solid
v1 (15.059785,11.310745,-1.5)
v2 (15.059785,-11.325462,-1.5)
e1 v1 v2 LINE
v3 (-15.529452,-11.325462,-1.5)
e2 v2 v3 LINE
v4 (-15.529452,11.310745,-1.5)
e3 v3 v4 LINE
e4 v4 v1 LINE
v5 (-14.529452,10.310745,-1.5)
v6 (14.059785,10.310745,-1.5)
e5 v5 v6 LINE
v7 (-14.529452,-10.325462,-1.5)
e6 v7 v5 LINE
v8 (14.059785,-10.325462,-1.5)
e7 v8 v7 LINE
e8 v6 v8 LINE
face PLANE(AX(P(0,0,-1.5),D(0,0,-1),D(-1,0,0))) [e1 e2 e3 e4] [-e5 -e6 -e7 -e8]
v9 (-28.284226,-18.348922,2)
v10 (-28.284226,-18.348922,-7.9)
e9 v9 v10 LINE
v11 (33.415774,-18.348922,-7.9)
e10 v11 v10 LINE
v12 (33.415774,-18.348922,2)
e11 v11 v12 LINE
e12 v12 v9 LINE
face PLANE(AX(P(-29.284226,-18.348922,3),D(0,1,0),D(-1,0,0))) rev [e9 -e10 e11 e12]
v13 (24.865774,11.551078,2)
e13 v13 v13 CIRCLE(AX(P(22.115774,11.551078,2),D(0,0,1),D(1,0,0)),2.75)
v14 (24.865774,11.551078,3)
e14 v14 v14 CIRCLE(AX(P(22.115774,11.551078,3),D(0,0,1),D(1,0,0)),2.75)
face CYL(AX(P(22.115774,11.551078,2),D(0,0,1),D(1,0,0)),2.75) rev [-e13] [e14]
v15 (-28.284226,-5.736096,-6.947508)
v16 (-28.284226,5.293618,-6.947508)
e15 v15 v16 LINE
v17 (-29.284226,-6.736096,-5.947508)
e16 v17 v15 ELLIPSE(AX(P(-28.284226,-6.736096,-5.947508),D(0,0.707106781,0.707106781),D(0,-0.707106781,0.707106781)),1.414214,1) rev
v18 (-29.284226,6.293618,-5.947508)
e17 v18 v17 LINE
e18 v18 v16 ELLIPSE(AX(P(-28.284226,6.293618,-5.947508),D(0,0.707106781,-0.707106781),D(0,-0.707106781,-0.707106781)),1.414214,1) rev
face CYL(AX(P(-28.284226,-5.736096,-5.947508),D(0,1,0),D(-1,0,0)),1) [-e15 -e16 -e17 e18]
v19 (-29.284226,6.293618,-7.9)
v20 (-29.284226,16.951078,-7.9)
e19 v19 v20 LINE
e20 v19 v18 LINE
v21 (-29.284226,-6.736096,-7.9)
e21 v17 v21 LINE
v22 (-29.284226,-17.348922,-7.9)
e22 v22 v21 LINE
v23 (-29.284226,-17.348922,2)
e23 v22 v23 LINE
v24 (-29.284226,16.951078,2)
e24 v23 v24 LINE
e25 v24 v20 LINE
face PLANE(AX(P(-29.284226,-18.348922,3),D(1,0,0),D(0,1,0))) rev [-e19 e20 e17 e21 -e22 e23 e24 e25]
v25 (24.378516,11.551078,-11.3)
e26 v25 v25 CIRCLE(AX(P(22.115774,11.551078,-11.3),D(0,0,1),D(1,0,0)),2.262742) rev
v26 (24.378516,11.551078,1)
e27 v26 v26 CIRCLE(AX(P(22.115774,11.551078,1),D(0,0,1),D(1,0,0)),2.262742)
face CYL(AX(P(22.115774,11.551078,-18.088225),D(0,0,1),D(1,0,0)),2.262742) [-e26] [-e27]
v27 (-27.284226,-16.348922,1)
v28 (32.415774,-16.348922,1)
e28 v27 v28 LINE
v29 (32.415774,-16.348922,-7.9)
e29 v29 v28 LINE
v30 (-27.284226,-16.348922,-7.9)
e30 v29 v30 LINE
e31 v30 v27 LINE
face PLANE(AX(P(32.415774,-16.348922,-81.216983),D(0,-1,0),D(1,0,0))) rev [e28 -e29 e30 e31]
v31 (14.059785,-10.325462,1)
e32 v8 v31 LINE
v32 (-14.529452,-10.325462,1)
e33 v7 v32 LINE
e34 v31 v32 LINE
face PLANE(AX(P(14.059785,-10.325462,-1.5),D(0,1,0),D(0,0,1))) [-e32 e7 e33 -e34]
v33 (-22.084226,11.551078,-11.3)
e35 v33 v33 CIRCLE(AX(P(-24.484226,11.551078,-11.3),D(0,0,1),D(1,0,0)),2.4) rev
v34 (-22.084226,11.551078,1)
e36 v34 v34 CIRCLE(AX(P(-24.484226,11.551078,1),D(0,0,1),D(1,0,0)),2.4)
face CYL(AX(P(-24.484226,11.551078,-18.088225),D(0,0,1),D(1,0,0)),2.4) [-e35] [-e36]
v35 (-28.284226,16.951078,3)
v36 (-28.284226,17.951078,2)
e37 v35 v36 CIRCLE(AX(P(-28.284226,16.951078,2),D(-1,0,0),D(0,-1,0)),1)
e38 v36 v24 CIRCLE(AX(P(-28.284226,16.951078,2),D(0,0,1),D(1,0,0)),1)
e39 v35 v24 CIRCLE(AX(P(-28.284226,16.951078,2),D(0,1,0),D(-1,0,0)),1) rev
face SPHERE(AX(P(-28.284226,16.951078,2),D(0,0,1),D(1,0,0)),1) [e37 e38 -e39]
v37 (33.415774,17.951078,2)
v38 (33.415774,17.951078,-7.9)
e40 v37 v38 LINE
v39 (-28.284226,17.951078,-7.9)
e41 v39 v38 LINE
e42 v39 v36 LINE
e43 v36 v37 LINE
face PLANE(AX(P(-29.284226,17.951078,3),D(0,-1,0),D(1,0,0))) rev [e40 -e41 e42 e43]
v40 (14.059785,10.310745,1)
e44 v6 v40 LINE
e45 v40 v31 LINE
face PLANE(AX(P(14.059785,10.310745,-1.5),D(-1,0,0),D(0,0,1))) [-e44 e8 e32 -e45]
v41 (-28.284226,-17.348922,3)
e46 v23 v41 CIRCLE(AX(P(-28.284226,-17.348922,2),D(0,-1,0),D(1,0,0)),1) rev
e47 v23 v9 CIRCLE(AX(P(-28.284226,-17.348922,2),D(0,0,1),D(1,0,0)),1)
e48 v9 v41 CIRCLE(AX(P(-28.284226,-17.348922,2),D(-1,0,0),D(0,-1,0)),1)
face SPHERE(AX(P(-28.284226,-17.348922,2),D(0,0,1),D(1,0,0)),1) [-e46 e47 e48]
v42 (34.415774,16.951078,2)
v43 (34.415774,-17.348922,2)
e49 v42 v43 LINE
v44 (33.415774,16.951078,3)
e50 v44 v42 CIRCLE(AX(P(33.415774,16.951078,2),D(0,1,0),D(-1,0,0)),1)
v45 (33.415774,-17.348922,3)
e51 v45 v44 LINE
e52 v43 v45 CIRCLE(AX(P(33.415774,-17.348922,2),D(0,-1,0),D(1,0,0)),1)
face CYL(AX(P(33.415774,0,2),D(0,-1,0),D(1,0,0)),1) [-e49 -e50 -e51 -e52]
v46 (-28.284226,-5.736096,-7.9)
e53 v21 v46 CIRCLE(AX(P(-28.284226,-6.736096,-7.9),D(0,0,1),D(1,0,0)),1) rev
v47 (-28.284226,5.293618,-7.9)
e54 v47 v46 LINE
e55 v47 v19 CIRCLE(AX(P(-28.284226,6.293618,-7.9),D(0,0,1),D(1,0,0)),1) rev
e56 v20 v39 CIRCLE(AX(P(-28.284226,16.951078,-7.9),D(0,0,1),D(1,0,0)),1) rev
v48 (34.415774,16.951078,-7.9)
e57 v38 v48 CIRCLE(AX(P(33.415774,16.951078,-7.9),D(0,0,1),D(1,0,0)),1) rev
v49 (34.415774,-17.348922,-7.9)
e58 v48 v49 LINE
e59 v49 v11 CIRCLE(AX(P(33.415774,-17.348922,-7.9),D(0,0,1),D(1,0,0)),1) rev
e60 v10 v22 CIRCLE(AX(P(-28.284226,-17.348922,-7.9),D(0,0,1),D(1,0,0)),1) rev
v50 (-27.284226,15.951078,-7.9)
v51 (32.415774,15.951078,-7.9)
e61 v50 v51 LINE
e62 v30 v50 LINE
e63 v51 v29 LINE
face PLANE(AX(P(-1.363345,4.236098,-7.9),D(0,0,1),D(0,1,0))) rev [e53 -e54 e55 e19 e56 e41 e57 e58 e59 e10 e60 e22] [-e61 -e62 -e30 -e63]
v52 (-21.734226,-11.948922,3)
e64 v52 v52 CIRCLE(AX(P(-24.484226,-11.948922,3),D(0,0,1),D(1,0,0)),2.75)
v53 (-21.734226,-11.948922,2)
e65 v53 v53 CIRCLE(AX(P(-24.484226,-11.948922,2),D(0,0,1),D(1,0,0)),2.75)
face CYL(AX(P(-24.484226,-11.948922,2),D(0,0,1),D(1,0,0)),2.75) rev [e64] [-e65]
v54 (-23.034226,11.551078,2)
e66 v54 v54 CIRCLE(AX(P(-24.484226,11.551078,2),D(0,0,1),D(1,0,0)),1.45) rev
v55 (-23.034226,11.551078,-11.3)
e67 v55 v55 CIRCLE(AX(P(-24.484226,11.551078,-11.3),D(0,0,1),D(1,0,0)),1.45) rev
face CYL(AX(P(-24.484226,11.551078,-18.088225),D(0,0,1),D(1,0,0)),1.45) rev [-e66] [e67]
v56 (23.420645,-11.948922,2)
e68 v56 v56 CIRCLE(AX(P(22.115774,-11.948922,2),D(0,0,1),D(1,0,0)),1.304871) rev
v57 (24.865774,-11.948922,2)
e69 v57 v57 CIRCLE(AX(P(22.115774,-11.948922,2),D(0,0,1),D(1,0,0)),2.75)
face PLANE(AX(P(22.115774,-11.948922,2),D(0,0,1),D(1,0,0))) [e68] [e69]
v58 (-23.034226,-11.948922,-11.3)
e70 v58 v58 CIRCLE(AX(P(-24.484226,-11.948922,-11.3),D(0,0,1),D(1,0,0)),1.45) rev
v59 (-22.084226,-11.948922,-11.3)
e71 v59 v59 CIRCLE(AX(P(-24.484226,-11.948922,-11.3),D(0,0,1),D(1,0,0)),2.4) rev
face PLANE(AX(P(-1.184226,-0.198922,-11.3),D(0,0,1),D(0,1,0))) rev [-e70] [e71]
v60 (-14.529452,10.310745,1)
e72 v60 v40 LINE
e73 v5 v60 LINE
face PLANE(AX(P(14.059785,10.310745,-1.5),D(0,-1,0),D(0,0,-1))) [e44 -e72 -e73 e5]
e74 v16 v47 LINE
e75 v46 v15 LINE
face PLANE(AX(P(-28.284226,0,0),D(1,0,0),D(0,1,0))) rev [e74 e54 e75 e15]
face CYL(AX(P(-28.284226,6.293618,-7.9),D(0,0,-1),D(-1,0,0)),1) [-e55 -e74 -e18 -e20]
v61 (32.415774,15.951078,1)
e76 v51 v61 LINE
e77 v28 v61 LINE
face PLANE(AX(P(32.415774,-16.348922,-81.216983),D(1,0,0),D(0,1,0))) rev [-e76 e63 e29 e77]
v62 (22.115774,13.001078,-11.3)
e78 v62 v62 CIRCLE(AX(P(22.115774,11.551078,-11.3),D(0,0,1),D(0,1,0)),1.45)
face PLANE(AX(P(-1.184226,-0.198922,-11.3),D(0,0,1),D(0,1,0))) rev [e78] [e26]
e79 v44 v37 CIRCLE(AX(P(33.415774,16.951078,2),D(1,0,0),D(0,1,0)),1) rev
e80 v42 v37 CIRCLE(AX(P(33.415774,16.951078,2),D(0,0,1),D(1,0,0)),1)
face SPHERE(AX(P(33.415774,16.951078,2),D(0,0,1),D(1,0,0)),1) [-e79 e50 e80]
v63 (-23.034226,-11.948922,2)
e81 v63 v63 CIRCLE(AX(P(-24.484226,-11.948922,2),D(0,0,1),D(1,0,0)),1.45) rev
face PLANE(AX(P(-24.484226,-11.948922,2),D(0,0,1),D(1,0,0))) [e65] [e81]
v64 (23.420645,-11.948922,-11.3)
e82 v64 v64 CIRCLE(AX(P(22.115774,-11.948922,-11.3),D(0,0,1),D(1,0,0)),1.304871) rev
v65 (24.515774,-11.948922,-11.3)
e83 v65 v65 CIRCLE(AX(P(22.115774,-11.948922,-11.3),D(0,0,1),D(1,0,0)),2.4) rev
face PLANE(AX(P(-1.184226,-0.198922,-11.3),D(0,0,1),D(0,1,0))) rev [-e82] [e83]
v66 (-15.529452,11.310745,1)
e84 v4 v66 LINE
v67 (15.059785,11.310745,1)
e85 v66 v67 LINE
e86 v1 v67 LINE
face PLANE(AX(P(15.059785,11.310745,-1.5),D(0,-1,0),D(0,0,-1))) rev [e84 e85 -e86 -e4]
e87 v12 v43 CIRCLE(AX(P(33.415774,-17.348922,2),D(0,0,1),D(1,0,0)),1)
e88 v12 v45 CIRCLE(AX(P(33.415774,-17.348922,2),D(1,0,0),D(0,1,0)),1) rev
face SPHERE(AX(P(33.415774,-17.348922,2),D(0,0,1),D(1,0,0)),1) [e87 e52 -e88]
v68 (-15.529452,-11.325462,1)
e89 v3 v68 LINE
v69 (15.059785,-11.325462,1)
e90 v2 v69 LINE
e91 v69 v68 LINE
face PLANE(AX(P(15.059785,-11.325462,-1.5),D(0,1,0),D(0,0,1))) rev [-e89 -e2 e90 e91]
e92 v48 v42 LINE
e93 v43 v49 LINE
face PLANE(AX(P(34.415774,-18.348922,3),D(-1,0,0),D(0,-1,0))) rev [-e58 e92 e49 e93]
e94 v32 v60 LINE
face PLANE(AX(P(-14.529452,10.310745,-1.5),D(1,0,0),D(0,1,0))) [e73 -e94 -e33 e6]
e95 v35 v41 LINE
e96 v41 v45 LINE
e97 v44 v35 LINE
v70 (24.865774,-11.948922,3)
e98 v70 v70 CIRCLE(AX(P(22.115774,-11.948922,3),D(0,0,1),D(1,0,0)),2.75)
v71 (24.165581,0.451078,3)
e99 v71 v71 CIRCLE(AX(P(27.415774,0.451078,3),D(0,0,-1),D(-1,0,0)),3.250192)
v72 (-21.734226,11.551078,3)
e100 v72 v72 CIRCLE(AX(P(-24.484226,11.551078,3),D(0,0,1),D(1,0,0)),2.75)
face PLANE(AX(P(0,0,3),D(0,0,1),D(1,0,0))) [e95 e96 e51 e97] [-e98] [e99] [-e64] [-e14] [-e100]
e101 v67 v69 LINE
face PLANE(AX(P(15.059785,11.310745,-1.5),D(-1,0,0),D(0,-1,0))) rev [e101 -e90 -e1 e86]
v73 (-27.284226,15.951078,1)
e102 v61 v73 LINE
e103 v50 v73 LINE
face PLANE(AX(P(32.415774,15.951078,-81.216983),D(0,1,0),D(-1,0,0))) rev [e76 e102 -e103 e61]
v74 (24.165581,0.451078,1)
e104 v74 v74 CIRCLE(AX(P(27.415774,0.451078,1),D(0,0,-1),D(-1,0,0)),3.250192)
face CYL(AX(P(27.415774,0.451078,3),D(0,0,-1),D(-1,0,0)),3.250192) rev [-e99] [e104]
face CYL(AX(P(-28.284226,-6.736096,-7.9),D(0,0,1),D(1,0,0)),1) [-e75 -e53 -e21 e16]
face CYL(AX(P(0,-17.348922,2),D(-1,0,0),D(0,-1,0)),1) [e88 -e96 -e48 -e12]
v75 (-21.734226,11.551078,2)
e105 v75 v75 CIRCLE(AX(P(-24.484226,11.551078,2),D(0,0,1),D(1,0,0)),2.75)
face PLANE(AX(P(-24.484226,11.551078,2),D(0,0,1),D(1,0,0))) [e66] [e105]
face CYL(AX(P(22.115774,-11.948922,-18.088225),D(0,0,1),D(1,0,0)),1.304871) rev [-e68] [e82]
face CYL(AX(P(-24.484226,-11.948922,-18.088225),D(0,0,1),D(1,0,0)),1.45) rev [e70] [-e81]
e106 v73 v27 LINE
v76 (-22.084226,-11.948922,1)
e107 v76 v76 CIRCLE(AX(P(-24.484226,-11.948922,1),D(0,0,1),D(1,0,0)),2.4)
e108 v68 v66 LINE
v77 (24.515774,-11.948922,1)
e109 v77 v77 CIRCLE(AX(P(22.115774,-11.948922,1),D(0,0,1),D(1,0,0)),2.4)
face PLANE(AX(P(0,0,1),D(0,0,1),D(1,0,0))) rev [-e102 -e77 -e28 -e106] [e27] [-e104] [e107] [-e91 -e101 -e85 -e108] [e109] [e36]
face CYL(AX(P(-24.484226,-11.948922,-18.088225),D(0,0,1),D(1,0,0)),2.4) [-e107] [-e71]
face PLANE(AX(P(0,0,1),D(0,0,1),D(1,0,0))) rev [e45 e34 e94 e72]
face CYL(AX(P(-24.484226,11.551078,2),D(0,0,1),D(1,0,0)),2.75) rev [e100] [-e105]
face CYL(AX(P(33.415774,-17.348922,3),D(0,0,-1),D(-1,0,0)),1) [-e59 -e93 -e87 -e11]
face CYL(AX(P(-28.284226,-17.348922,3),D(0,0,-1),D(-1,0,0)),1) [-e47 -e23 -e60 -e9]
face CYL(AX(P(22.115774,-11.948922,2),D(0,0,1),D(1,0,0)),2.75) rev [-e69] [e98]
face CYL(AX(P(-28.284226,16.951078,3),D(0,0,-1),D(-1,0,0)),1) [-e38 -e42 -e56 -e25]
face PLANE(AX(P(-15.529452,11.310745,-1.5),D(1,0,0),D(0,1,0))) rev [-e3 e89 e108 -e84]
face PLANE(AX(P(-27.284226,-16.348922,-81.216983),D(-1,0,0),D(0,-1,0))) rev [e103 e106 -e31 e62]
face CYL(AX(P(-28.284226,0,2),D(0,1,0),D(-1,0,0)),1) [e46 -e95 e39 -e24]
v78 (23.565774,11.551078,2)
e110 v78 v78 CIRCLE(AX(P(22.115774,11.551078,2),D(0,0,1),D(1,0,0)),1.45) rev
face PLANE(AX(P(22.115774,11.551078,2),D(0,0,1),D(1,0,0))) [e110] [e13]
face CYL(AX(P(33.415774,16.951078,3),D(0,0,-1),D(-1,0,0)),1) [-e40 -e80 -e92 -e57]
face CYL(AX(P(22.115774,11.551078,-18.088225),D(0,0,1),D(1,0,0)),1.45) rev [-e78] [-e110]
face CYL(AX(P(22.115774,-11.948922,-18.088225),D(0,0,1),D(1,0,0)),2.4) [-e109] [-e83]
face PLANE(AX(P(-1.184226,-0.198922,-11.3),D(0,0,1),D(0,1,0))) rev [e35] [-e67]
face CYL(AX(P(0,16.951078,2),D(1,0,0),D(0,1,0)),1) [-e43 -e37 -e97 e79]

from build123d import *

# Parameters (mm, degrees)
CROQUIS2_R                = 2.4
CROQUIS2_R_2              = 1.45
SALIENTE_EXTRUIR2_DEPTH   = 12.3
SALIENTE_EXTRUIR2_2_DEPTH = 12.3
CROQUIS2_R_3              = 2.2627417
SALIENTE_EXTRUIR2_3_DEPTH = 12.3
CROQUIS2_R_4              = 1.304870774
SALIENTE_EXTRUIR2_4_DEPTH = 12.3
CROQUIS4_W                = 36.3
CROQUIS4_H                = 63.7
CROQUIS4_W_2              = 32.3
CROQUIS4_H_2              = 59.7
SALIENTE_EXTRUIR4_DEPTH   = 8.9
CROQUIS5_W                = 36.3
CROQUIS5_H                = 63.7
SALIENTE_EXTRUIR5_DEPTH   = 2
REDONDEO1_R               = 1
CROQUIS6_W                = 0.952491513
CROQUIS6_H                = 11.029714725
CORTAR_EXTRUIR1_DEPTH     = 1
REDONDEO2_R               = 1
CROQUIS7_R                = 1.45
CROQUIS7_R_2              = 1.304870774
CORTAR_EXTRUIR2_DEPTH     = 42.540563821
CROQUIS8_R                = 2.75
CORTAR_EXTRUIR3_DEPTH     = 1
CROQUIS9_R                = 3.250192478
CORTAR_EXTRUIR4_DEPTH     = 41.895212954
CROQUIS10_W               = 30.589236147
CROQUIS10_H               = 22.63620754
CROQUIS10_W_2             = 28.589236147
CROQUIS10_H_2             = 20.63620754
SALIENTE_EXTRUIR6_DEPTH   = 2.5


with BuildPart() as part:
    # Croquis2 → Saliente-Extruir2 (new body)
    with BuildSketch(Plane(origin=(-1.363345475, 4.236097797, 1), x_dir=(0, 1, 0), z_dir=(0, 0, 1))):
        with Locations(Location((-16.185020115, 23.120880637, 0), (0, 0, 270))):
            Circle(CROQUIS2_R)
        with Locations(Location((-16.185020115, 23.120880637, 0), (0, 0, 270))):
            Circle(CROQUIS2_R_2, mode=Mode.SUBTRACT)
    extrude(amount=-SALIENTE_EXTRUIR2_DEPTH)



with BuildPart() as body_2:
    # Croquis2 → Saliente-Extruir2 2 (new body)
    with BuildSketch(Plane(origin=(-1.363345475, 4.236097797, 1), x_dir=(0, 1, 0), z_dir=(0, 0, 1))):
        with Locations(Location((7.314979885, 23.120880637, 0), (0, 0, 270))):
            Circle(CROQUIS2_R)
        with Locations(Location((7.314979885, 23.120880637, 0), (0, 0, 270))):
            Circle(CROQUIS2_R_2, mode=Mode.SUBTRACT)
    extrude(amount=-SALIENTE_EXTRUIR2_2_DEPTH)


with BuildPart() as body_3:
    # Croquis2 → Saliente-Extruir2 3 (new body)
    with BuildSketch(Plane(origin=(-1.363345475, 4.236097797, 1), x_dir=(0, 1, 0), z_dir=(0, 0, 1))):
        with Locations(Location((7.314979885, -23.479119363, 0), (0, 0, 270))):
            Circle(CROQUIS2_R_3)
        with Locations(Location((7.314979885, -23.479119363, 0), (0, 0, 270))):
            Circle(CROQUIS2_R_2, mode=Mode.SUBTRACT)
    extrude(amount=-SALIENTE_EXTRUIR2_3_DEPTH)


with BuildPart() as body_4:
    # Croquis2 → Saliente-Extruir2 4 (new body)
    with BuildSketch(Plane(origin=(-1.363345475, 4.236097797, 1), x_dir=(0, 1, 0), z_dir=(0, 0, 1))):
        with Locations(Location((-16.185020115, -23.479119363, 0), (0, 0, 270))):
            Circle(CROQUIS2_R)
        with Locations(Location((-16.185020115, -23.479119363, 0), (0, 0, 270))):
            Circle(CROQUIS2_R_4, mode=Mode.SUBTRACT)
    extrude(amount=-SALIENTE_EXTRUIR2_4_DEPTH)


with BuildPart() as body_5:
    # Croquis4 → Saliente-Extruir4 (new body)
    with BuildSketch(Plane(origin=(-1.363345475, 4.236097797, 1), x_dir=(0, 1, 0), z_dir=(0, 0, 1))):
        with Locations((-4.435020115, -3.929119363)):
            Rectangle(CROQUIS4_W, CROQUIS4_H)
        with Locations((-4.435020115, -3.929119363)):
            Rectangle(CROQUIS4_W_2, CROQUIS4_H_2, mode=Mode.SUBTRACT)
    extrude(amount=-SALIENTE_EXTRUIR4_DEPTH)


with BuildPart() as part_1:
    add(part.part)

    add(body_2.part)  # Saliente-Extruir5 merges body 2

    add(body_3.part)  # Saliente-Extruir5 merges body 3

    add(body_4.part)  # Saliente-Extruir5 merges body 4

    add(body_5.part)  # Saliente-Extruir5 merges body 5
    # Croquis5 → Saliente-Extruir5 (add)
    with BuildSketch(Plane(origin=(-1.363345475, 4.236097797, 1), x_dir=(0, 1, 0), z_dir=(0, 0, 1))):
        with Locations((-4.435020115, -3.929119363)):
            Rectangle(CROQUIS5_W, CROQUIS5_H)
    extrude(amount=SALIENTE_EXTRUIR5_DEPTH)

    # Redondeo1
    redondeo1_edges = [part_1.edges().sort_by_distance(p)[0] for p in [
        (-29.284226112, -18.348922317, -2.45),
        (34.415773888, -18.348922317, -2.45),
        (34.415773888, 17.951077683, -2.45),
        (-29.284226112, 17.951077683, -2.45),
        (2.565773888, -18.348922317, 3),
        (34.415773888, -0.198922317, 3),
        (2.565773888, 17.951077683, 3),
        (-29.284226112, -0.198922317, 3),
    ]]
    fillet(redondeo1_edges, radius=REDONDEO1_R)

    # Croquis6 → Cortar-Extruir1 (cut)
    with BuildSketch(Plane.ZY.offset(29.284226112)):
        with Locations((-7.423754244, -0.221239115)):
            Rectangle(CROQUIS6_W, CROQUIS6_H)
    extrude(amount=-CORTAR_EXTRUIR1_DEPTH, mode=Mode.SUBTRACT)

    # Redondeo2
    redondeo2_edges = [part_1.edges().sort_by_distance(p)[0] for p in [
        (-29.284226112, -5.736096478, -7.423754243),
        (-29.284226112, 5.293618247, -7.423754243),
        (-29.284226112, -0.221239116, -6.947508487),
    ]]
    fillet(redondeo2_edges, radius=REDONDEO2_R - 0.0001)  # a hair under: the kernel refuses the full size

    # Croquis7 → Cortar-Extruir2 (cut, through all)
    with BuildSketch(Plane(origin=(0, 0, -11.3), x_dir=(-1, 0, 0), z_dir=(0, 0, -1))):
        with Locations(Location((24.484226112, 11.551077683, 0), (0, 0, 180))):
            Circle(CROQUIS7_R)
        with Locations(Location((24.484226112, -11.948922317, 0), (0, 0, 180))):
            Circle(CROQUIS7_R)
        with Locations(Location((-22.115773888, -11.948922317, 0), (0, 0, 180))):
            Circle(CROQUIS7_R_2)
        with Locations(Location((-22.115773888, 11.551077683, 0), (0, 0, 90))):
            Circle(CROQUIS7_R)
    extrude(amount=-CORTAR_EXTRUIR2_DEPTH, mode=Mode.SUBTRACT)

    # Croquis8 → Cortar-Extruir3 (cut)
    with BuildSketch(Plane.XY.offset(3)):
        with Locations((-24.484226112, -11.948922317)):
            Circle(CROQUIS8_R)
        with Locations((-24.484226112, 11.551077683)):
            Circle(CROQUIS8_R)
        with Locations((22.115773888, -11.948922317)):
            Circle(CROQUIS8_R)
        with Locations((22.115773888, 11.551077683)):
            Circle(CROQUIS8_R)
    extrude(amount=-CORTAR_EXTRUIR3_DEPTH, mode=Mode.SUBTRACT)

    # Croquis9 → Cortar-Extruir4 (cut, through all)
    with BuildSketch(Plane(origin=(0, 0, 1), x_dir=(-1, 0, 0), z_dir=(0, 0, -1))):
        with Locations((-27.415773888, 0.451077683)):
            Circle(CROQUIS9_R)
    extrude(amount=-CORTAR_EXTRUIR4_DEPTH, mode=Mode.SUBTRACT)

    # Croquis10 → Saliente-Extruir6 (add)
    with BuildSketch(Plane(origin=(0, 0, 1), x_dir=(-1, 0, 0), z_dir=(0, 0, -1))):
        with Locations((0.23483353, -0.007358301)):
            Rectangle(CROQUIS10_W, CROQUIS10_H)
        with Locations((0.234833529, -0.007358301)):
            Rectangle(CROQUIS10_W_2, CROQUIS10_H_2, mode=Mode.SUBTRACT)
    extrude(amount=SALIENTE_EXTRUIR6_DEPTH)


solid = part_1.part
